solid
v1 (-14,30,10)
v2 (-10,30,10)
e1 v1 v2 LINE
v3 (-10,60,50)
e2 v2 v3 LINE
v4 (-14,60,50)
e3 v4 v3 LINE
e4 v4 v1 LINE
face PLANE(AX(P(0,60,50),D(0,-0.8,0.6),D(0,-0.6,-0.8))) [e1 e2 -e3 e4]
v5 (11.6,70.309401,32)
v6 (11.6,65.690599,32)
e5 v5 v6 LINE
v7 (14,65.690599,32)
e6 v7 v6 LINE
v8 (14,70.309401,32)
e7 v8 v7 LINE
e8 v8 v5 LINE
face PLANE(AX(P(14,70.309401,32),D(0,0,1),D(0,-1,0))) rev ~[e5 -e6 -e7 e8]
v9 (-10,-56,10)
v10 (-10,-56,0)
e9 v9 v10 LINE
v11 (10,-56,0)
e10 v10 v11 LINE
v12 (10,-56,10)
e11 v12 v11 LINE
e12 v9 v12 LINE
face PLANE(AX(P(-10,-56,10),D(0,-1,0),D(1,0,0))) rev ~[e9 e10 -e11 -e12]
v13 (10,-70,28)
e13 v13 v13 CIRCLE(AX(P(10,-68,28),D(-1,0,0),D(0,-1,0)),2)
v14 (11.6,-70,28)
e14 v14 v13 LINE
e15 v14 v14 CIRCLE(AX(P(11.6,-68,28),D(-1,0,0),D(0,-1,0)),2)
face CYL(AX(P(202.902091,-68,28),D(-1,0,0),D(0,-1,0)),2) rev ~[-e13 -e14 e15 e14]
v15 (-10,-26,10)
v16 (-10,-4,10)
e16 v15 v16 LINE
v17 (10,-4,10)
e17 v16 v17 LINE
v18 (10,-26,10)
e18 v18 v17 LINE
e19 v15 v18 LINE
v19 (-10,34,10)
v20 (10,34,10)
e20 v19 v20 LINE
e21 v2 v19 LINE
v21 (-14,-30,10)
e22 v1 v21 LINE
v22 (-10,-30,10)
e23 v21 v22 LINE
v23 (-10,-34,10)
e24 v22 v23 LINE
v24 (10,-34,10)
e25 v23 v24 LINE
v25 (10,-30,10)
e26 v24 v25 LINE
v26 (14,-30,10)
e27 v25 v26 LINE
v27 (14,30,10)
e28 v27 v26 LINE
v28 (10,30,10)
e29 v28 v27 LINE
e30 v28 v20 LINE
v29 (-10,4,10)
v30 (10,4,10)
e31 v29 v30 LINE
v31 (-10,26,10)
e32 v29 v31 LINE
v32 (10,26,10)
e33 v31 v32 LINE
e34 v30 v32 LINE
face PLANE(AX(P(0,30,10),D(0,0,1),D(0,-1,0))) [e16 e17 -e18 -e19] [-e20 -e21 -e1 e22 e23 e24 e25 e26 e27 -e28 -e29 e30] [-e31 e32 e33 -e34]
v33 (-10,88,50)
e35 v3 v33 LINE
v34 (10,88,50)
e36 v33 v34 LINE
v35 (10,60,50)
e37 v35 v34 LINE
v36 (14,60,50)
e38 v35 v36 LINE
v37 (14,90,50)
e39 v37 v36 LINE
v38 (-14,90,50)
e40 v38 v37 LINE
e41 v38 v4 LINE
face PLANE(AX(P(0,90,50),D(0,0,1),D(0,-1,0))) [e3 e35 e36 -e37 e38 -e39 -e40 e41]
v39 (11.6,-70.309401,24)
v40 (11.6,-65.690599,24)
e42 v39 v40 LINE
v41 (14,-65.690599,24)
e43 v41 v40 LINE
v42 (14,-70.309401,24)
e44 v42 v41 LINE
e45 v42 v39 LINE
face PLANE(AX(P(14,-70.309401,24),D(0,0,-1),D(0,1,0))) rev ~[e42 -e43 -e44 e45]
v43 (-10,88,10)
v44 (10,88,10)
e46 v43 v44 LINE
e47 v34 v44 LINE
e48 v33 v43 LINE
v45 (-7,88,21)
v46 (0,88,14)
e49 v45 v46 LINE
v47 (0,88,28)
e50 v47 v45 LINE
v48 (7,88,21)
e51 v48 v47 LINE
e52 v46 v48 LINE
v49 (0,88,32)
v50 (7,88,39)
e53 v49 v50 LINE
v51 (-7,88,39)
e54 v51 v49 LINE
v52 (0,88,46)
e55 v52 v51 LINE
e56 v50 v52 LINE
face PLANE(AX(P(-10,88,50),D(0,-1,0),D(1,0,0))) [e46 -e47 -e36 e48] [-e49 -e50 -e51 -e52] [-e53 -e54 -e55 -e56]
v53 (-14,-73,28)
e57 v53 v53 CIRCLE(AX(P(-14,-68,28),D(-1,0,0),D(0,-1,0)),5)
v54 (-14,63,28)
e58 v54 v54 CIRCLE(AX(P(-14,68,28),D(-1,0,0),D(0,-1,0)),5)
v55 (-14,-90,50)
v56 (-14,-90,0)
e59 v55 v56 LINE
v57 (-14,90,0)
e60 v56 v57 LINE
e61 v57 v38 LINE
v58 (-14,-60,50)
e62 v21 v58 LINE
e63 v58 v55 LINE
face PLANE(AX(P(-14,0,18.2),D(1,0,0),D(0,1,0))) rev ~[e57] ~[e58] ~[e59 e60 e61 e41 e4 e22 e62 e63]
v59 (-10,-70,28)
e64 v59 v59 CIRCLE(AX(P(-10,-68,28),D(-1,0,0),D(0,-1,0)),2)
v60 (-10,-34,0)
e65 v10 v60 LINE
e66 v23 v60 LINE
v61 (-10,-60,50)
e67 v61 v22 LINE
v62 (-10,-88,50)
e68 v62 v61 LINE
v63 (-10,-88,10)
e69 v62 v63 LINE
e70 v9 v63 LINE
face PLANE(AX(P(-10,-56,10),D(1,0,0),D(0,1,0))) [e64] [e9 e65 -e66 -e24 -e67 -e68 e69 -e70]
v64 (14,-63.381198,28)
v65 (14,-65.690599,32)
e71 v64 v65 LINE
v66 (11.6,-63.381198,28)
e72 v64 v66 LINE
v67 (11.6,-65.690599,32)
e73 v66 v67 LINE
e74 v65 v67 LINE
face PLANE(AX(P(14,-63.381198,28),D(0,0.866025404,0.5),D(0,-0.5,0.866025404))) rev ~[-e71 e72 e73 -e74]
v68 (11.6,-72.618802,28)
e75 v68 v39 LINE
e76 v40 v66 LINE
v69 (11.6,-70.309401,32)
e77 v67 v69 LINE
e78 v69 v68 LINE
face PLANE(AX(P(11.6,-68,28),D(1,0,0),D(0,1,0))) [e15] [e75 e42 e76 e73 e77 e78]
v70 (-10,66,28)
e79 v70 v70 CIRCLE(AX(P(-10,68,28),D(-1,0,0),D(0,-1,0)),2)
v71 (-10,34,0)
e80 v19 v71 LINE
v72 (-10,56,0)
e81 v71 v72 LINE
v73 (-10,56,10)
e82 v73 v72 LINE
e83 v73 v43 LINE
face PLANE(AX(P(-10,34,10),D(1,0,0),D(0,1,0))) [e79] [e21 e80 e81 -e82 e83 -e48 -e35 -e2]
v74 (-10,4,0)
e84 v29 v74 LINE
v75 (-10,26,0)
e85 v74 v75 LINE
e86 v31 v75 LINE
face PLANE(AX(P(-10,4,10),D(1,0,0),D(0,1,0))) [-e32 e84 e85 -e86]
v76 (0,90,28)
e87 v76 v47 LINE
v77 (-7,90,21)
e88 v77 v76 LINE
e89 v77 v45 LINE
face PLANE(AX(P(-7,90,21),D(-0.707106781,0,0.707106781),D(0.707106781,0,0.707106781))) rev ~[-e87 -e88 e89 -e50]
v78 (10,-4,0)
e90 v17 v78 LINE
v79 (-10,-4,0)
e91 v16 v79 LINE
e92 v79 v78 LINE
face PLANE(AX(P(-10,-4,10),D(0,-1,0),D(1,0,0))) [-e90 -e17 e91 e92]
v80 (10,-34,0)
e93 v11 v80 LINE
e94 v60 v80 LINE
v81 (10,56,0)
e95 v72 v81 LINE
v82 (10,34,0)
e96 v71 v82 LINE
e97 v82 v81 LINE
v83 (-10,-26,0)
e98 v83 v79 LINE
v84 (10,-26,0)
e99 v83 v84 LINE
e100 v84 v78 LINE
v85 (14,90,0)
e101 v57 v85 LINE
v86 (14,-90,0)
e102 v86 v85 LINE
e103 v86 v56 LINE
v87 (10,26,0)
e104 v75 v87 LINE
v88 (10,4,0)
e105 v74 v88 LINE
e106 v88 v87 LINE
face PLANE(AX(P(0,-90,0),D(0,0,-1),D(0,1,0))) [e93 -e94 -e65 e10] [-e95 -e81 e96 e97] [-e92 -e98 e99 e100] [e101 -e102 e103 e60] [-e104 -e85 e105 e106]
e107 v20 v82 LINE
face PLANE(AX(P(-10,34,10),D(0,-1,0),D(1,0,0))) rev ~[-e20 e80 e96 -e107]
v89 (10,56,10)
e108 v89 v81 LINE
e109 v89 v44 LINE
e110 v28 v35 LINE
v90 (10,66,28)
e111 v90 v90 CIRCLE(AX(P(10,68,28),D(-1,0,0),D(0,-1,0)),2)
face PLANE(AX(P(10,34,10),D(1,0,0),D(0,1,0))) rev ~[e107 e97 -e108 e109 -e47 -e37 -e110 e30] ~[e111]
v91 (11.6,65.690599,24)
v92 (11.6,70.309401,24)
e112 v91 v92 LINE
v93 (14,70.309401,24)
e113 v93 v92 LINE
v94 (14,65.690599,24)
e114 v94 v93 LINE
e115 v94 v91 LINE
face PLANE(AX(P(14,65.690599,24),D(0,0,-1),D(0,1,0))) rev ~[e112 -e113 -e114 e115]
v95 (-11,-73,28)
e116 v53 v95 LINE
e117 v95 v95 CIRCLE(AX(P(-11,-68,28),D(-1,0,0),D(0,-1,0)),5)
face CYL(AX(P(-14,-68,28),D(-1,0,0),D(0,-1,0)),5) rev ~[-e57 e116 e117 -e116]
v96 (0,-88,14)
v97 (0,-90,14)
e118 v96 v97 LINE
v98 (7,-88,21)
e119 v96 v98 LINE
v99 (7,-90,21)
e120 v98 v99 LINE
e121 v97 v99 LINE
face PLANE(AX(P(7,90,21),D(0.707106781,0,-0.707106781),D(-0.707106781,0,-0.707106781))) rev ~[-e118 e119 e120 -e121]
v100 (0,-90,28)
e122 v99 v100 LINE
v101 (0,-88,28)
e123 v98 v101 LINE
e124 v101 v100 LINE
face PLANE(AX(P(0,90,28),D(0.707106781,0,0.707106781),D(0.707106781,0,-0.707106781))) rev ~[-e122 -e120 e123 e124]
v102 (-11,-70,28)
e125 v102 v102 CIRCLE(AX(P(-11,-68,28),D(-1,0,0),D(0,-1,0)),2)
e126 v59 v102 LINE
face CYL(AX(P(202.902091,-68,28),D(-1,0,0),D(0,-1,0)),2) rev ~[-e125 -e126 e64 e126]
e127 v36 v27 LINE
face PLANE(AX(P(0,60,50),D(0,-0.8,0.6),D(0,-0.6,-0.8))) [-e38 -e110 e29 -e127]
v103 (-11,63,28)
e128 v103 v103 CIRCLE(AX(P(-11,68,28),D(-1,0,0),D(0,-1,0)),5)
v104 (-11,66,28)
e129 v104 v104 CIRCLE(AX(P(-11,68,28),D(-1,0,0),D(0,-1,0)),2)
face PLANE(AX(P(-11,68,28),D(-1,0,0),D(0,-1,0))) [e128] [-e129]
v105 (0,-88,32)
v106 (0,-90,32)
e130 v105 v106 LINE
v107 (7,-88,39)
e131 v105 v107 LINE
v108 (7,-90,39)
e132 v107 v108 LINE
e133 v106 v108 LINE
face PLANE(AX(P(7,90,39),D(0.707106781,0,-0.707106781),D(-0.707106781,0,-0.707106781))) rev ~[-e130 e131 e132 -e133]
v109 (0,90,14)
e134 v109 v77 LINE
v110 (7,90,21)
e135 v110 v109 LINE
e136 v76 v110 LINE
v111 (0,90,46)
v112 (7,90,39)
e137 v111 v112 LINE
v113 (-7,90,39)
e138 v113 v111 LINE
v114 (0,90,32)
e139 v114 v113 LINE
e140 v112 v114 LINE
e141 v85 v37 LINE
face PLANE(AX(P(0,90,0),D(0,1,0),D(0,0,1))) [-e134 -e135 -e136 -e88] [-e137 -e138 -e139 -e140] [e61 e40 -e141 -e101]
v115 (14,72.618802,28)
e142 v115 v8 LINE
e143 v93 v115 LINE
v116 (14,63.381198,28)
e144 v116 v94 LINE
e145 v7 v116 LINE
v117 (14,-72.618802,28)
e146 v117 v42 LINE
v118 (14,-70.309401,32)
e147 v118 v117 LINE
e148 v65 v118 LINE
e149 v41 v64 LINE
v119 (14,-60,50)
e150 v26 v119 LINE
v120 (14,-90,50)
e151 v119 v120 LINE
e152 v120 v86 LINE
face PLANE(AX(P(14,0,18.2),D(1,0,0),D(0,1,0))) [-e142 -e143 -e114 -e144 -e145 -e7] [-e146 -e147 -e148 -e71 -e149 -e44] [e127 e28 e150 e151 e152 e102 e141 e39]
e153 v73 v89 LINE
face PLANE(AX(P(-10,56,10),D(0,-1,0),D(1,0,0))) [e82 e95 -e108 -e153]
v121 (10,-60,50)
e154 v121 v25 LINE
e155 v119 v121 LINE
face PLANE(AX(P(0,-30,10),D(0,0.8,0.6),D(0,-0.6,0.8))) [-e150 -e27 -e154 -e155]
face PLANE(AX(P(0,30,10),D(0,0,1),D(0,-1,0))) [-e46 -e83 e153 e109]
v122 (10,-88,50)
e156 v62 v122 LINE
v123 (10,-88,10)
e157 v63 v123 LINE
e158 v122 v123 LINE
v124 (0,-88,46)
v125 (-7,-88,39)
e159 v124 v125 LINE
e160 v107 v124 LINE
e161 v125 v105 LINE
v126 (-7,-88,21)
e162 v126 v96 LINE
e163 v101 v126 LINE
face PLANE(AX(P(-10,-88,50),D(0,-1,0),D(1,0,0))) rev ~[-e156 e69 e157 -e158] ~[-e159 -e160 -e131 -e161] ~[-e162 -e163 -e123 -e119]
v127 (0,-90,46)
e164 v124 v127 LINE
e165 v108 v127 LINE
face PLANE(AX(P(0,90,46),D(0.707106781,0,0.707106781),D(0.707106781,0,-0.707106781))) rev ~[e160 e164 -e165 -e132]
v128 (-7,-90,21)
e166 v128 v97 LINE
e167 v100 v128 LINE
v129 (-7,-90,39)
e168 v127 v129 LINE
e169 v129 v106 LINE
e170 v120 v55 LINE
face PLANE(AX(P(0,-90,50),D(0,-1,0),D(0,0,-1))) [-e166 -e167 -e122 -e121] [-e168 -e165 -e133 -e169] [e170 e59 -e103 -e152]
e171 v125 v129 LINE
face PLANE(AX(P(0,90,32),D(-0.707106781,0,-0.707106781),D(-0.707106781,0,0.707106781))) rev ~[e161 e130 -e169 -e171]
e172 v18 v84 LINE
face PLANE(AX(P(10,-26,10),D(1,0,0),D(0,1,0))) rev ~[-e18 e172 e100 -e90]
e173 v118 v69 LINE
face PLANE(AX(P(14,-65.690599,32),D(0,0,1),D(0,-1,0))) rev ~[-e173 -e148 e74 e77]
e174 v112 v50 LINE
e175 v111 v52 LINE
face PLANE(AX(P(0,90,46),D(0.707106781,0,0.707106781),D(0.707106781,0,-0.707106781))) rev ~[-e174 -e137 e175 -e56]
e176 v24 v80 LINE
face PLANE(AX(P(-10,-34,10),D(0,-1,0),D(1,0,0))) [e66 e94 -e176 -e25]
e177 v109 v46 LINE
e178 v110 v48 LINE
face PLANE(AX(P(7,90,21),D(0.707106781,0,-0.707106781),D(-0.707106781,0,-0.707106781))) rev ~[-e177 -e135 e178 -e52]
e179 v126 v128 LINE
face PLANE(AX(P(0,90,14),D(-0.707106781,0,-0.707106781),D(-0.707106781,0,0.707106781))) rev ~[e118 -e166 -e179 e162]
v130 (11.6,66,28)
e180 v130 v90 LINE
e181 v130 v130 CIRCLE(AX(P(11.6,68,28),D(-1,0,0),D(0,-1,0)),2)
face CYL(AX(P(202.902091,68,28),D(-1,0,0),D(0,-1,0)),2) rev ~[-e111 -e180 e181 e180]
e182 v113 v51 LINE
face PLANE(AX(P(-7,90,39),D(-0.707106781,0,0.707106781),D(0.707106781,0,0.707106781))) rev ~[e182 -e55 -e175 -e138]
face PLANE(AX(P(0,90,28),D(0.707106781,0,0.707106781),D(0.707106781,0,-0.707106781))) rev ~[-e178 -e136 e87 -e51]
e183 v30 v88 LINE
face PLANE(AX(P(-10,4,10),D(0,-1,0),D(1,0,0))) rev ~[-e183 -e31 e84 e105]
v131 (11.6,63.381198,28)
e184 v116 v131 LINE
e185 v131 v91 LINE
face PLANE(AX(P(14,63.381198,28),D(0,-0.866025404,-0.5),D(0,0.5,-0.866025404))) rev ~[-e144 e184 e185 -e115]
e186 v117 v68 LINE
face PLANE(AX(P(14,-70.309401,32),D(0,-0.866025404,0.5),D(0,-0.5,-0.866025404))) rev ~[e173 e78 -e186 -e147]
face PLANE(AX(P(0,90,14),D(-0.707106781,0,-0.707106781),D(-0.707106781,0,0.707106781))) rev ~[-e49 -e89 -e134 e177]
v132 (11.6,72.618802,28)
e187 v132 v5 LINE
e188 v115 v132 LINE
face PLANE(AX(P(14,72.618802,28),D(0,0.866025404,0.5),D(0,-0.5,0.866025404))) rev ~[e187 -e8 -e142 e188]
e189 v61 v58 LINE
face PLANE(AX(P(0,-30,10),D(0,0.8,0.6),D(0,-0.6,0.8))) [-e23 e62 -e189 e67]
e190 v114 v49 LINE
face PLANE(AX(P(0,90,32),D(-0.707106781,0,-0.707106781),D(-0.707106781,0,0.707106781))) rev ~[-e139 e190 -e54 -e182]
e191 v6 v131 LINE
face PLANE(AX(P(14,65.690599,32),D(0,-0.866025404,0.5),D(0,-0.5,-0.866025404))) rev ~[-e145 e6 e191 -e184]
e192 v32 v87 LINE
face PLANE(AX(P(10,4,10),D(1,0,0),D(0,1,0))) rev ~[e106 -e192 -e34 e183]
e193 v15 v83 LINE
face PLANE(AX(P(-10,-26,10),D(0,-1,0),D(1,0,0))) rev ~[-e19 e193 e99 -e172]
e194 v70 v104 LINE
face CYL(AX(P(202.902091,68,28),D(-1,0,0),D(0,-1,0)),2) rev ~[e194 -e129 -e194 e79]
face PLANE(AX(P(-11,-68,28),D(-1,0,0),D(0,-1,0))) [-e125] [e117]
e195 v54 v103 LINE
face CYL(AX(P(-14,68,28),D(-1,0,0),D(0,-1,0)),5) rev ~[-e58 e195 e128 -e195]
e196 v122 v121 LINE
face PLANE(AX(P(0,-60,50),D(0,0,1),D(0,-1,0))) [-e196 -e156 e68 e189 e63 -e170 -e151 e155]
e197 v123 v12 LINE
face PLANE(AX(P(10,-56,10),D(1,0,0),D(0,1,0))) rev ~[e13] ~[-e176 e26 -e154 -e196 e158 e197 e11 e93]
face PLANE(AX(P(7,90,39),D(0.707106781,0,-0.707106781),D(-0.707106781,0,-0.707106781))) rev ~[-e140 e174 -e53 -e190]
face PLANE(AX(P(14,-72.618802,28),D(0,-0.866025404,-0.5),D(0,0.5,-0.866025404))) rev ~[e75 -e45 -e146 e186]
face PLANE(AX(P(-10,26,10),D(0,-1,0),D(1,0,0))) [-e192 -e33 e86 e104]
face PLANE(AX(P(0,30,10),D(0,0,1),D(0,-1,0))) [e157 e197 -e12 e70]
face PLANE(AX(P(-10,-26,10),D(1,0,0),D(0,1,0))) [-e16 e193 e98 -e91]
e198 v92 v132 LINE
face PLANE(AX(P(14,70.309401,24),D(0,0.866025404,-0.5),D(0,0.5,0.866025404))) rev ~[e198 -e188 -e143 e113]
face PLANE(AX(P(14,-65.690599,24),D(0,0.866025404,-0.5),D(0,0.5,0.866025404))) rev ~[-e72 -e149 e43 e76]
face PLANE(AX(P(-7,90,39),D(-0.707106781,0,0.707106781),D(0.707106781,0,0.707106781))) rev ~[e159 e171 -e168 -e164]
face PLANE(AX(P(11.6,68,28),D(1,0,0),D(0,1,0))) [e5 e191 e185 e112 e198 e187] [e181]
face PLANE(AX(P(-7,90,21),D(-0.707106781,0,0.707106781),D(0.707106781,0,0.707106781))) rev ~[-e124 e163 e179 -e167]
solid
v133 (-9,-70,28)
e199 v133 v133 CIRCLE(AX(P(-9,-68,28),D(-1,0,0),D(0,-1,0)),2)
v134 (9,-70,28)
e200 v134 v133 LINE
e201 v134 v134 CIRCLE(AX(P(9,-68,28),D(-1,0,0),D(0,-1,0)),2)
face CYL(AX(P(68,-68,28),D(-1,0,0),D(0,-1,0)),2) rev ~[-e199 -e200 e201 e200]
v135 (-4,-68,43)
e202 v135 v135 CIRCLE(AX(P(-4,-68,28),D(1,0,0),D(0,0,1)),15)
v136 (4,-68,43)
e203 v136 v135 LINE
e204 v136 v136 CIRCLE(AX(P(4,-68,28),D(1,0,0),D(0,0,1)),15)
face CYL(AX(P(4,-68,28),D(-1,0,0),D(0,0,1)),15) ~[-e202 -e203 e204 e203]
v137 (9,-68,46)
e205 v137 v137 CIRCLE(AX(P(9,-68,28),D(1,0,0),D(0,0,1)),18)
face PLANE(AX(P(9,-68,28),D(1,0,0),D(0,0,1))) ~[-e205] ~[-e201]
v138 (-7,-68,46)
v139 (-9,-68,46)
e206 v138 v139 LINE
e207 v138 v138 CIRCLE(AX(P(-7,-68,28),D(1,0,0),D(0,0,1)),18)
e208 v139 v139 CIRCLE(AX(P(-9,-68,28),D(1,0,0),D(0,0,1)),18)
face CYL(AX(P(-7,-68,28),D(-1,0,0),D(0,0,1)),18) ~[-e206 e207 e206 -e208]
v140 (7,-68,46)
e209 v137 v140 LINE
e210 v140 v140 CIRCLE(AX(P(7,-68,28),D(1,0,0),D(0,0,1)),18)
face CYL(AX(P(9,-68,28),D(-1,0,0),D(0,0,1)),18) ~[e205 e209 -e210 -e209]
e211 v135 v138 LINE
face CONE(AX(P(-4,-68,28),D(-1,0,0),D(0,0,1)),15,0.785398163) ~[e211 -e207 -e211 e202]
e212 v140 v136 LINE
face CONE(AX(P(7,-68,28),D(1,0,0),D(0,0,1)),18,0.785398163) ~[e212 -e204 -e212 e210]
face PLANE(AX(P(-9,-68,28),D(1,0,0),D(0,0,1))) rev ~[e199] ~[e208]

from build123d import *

# Parameters (mm, degrees)
F0_R      = 15
F1_DEPTH  = 14
F2_W      = 20
F2_H      = 30
F3_DEPTH  = 40
F2_H_2    = 58
F2_H_3    = 28
F4_DEPTH  = 40
F9_D      = 4
F9_2_D    = 4
F10_W     = 20
F10_H     = 22
F11_DEPTH = 10
F12_DEPTH = 2.4
F13_R     = 5
F14_DEPTH = 3
F16_DEPTH = 180.001


with BuildPart() as f1:
    # F0 (on Right) → F1 (new body, symmetric)
    with BuildSketch(Plane.YZ):
        Polygon((-90, 0), (0, 0), (90, 0), (90, 50), (60, 50), (30, 10), (0, 10), (-30, 10), (-60, 50), (-90, 50), align=None)
        with Locations((-68, 28)):
            Circle(F0_R, mode=Mode.SUBTRACT)
        with Locations((-68, 28)):
            Circle(F0_R)
    extrude(amount=F1_DEPTH, both=True)

    # F2 (on face) → F3 (cut, through all)
    with BuildSketch(Plane.XY.offset(50)):
        with Locations((0, -45)):
            Rectangle(F2_W, F2_H)
    extrude(amount=-F3_DEPTH, mode=Mode.SUBTRACT)

    # F2 (on face) → F4 (cut, through all)
    with BuildSketch(Plane.XY.offset(50)):
        with Locations((0, 59)):
            Rectangle(F2_W, F2_H_2)
        with Locations((0, -74)):
            Rectangle(F2_W, F2_H_3)
    extrude(amount=-F4_DEPTH, mode=Mode.SUBTRACT)

    # F9 (through all)
    with Locations(Plane.YZ.offset(14)):
        with Locations((-68, 28), (68, 28)):
            Hole(F9_D / 2)

    # F10 (on face) → F11 (cut, through all)
    with BuildSketch(Plane.XY.offset(10)):
        with Locations((0, 15)):
            Rectangle(F10_W, F10_H)
        with Locations((0, -15)):
            Rectangle(F10_W, F10_H)
        with Locations((0, -45)):
            Rectangle(F10_W, F10_H)
        with Locations((0, 45)):
            Rectangle(F10_W, F10_H)
    extrude(amount=-F11_DEPTH, mode=Mode.SUBTRACT)

    # F8 (on face) → F12 (cut, through all)
    with BuildSketch(Plane.YZ.offset(14)):
        Polygon((-70.3094010768, 24), (-65.6905989232, 24), (-63.3811978465, 28), (-65.6905989232, 32), (-70.3094010768, 32), (-72.6188021535, 28), align=None)
        Polygon((70.3094010768, 32), (65.6905989232, 32), (63.3811978465, 28), (65.6905989232, 24), (70.3094010768, 24), (72.6188021535, 28), align=None)
    extrude(amount=-F12_DEPTH, mode=Mode.SUBTRACT)

    # F13 (on face) → F14 (cut)
    with BuildSketch(Plane(origin=(-14, 0, 0), x_dir=(0, -1, 0), z_dir=(-1, 0, 0))):
        with Locations((68, 28)):
            Circle(F13_R)
        with Locations((-68, 28)):
            Circle(F13_R)
    extrude(amount=-F14_DEPTH, mode=Mode.SUBTRACT)

    # F15 (on face) → F16 (cut, through all)
    with BuildSketch(Plane(origin=(0, 90, 0), x_dir=(-1, 0, 0), z_dir=(0, 1, 0))):
        Polygon((-7, 39), (0, 32), (7, 39), (0, 46), align=None)
        Polygon((7, 21), (0, 28), (-7, 21), (0, 14), align=None)
    extrude(amount=-F16_DEPTH, mode=Mode.SUBTRACT)


with BuildPart() as f7:
    # F6 (on plane+point) → F7 (revolve)
    with BuildSketch(Plane.XZ.offset(68)):
        Polygon((4, 43), (0, 43), (-4, 43), (-7, 46), (-9, 46), (-9, 28), (0, 28), (9, 28), (9, 46), (7, 46), align=None)
    revolve(axis=Axis((-4.5, -68, 28), (1, 0, 0)))

    # F9#2 (through all)
    with Locations(Plane.YZ.offset(14)):
        with Locations((-68, 28), (68, 28)):
            Hole(F9_2_D / 2)


solid = Compound([f1.part, f7.part])
